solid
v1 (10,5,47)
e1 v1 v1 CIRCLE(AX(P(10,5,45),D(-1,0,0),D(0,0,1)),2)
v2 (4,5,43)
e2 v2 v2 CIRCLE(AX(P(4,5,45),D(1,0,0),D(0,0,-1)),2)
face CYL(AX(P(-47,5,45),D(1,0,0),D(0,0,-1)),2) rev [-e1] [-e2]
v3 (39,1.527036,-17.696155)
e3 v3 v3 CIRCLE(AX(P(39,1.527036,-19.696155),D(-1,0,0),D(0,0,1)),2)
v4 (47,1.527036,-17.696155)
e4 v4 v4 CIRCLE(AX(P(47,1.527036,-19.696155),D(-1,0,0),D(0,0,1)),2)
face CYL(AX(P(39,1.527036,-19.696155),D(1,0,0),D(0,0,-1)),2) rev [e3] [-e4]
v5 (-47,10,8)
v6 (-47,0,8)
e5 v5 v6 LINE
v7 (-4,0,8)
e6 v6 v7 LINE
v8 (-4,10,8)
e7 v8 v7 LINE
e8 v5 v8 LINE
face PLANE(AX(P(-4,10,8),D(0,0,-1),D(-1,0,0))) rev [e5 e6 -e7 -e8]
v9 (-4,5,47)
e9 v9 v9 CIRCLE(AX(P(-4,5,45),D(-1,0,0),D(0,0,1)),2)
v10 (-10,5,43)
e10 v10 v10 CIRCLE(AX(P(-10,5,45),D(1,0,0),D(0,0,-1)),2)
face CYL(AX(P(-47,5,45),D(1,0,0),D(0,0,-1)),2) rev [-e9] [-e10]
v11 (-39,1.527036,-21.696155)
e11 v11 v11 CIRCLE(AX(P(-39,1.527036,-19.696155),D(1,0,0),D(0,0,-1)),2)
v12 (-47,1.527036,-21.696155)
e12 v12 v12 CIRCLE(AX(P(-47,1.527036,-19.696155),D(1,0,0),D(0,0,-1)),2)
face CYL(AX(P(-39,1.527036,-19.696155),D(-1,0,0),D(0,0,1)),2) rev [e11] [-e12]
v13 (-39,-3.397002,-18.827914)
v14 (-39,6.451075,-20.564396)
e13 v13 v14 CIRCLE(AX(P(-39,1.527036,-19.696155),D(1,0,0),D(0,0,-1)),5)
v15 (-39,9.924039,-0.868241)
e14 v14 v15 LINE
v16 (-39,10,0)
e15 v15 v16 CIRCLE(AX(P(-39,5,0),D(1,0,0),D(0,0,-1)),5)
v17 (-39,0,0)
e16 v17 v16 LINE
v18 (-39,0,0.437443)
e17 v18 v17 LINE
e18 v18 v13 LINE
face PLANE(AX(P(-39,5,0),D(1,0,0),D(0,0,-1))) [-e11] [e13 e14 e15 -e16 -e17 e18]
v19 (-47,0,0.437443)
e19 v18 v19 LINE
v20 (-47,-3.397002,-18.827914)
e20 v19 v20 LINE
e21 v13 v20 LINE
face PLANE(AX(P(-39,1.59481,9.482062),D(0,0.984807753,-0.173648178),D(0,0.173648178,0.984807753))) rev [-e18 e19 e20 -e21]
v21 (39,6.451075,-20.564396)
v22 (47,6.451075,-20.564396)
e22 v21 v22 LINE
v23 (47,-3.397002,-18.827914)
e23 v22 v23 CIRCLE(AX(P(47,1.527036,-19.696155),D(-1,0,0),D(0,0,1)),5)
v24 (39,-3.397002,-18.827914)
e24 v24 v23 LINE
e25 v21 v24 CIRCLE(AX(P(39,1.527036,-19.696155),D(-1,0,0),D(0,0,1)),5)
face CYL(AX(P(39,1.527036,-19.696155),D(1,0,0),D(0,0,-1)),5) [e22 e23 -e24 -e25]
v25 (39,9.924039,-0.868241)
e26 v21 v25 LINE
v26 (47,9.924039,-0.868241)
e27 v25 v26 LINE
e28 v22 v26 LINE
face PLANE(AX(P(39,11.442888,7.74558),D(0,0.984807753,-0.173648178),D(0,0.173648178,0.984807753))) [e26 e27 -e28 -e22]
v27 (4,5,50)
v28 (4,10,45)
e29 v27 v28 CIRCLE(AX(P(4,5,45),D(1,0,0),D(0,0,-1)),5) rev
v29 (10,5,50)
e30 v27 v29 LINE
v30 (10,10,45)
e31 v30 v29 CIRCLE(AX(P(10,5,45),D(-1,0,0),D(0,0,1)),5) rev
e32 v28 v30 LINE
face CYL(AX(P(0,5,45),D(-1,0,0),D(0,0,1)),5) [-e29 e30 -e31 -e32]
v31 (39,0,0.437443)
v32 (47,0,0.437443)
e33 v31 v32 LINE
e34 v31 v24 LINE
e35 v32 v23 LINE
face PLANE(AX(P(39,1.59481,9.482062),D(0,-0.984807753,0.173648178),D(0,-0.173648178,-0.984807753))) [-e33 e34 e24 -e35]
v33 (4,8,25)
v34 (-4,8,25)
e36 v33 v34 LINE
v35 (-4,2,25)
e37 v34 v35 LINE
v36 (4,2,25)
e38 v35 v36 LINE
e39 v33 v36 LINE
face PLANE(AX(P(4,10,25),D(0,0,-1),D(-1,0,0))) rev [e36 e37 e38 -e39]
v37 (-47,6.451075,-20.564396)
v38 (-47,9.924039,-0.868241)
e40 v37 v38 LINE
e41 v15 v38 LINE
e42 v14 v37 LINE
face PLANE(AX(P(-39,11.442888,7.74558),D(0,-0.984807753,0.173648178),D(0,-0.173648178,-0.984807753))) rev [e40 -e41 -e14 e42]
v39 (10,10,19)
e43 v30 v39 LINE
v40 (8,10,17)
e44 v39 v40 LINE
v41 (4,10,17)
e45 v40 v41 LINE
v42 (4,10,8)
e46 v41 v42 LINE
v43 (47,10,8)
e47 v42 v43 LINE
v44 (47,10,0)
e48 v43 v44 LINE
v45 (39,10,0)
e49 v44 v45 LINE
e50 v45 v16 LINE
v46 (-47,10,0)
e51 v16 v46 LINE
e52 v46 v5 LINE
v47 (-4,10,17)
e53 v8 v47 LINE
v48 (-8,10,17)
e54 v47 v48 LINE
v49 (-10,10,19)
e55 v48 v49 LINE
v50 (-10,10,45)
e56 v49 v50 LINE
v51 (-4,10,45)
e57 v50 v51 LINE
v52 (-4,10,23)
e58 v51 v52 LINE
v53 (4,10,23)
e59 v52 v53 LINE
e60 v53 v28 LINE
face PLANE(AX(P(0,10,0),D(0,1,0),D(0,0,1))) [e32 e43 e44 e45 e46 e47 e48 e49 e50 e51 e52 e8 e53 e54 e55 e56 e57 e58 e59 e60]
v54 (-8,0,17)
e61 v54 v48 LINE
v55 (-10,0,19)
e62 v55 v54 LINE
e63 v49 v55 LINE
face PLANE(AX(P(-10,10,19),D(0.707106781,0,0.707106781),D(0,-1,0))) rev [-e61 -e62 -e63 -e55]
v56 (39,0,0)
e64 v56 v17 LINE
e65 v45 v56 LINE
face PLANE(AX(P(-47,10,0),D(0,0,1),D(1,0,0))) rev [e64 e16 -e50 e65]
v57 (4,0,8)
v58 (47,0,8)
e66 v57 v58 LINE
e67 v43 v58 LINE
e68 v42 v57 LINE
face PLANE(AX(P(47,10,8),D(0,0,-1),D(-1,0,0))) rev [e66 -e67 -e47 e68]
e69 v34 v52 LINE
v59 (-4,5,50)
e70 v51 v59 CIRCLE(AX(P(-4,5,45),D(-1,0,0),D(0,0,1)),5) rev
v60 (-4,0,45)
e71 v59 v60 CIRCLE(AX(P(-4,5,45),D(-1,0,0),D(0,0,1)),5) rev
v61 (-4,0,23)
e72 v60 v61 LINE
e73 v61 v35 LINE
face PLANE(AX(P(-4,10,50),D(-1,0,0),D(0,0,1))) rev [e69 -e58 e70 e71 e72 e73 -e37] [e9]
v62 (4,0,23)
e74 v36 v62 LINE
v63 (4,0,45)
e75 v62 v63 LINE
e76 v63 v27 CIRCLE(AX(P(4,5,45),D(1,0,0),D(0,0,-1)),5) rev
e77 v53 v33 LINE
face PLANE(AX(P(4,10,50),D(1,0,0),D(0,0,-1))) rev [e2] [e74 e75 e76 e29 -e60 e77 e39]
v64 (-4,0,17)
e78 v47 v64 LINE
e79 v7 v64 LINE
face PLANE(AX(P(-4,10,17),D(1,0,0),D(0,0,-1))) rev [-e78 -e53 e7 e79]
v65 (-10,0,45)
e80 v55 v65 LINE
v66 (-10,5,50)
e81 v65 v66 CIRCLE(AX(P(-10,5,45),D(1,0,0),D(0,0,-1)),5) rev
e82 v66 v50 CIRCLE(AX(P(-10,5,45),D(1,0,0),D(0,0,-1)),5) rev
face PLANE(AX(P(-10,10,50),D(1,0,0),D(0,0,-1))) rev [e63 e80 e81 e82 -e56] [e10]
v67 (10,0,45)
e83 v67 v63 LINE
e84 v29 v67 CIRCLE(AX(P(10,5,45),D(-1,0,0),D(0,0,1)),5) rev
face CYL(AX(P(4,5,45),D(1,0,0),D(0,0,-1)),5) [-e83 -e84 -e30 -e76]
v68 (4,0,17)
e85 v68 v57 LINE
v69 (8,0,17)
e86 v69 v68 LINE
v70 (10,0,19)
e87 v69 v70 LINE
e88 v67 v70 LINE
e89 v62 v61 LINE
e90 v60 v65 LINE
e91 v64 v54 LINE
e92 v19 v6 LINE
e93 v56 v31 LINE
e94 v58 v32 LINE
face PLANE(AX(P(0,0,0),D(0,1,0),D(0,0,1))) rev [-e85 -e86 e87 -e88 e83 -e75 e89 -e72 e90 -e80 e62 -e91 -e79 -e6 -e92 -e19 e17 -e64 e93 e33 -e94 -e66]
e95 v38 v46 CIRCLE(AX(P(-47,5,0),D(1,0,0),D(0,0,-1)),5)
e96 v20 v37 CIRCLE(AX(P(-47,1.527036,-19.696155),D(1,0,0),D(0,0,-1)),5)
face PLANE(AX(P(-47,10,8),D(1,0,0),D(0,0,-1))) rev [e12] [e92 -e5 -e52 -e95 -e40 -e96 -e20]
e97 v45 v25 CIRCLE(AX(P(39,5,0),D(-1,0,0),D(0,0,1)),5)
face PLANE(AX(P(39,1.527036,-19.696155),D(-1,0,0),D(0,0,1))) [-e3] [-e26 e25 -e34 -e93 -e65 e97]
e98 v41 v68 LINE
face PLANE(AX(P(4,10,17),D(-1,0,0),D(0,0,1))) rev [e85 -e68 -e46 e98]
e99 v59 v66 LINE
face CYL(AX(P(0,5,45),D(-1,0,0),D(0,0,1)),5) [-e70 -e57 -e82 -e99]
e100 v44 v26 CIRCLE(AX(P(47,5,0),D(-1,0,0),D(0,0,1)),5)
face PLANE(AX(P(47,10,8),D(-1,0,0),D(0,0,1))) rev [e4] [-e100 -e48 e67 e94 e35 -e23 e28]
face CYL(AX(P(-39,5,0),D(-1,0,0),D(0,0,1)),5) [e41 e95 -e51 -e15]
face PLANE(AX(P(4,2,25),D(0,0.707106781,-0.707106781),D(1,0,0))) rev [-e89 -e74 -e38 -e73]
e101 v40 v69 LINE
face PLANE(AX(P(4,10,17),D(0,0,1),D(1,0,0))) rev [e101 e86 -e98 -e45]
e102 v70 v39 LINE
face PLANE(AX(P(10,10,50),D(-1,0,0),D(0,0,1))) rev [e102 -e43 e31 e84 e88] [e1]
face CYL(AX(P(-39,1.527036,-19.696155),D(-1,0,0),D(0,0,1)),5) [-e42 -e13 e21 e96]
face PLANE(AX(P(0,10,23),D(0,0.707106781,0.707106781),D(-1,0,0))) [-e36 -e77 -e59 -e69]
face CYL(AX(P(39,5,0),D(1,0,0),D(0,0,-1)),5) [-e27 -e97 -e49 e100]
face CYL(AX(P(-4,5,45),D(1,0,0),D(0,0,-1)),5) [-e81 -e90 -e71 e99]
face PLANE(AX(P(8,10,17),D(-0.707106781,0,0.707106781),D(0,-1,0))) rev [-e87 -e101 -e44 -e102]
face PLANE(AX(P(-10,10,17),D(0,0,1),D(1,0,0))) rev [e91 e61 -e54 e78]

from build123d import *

# Parameters (mm, degrees)
EXTRUDE_1_DEPTH          = 10
FILLET_1_R               = 5
EXTRUDE_START            = 47
SKETCH_6_R               = 2
EXTRUDE_2_DEPTH          = 8
EXTRUDE_START_2          = -39
SKETCH_6_2_R             = 2
EXTRUDE_3_DEPTH          = 8
CUT_EXTRUDE_4_DEPTH      = 70.34695379
CUT_EXTRUDE_4_DEPTH_BACK = 70.34695379
SKETCH_7_R               = 2
CHAMFER_1_SIZE           = 2
CHAMFER_2_SIZE           = 2


with BuildPart() as part:
    # 草图1 → 凸台-拉伸1 (new body)
    with BuildSketch(Plane(origin=(0, 0, 0), x_dir=(1, 0, 0), z_dir=(0, 1, 0))):
        Polygon((-4, -50), (-10, -50), (-10, -17), (-4, -17), (-4, -8), (-47, -8), (-47, 0), (47, 0), (47, -8), (4, -8), (4, -17), (10, -17), (10, -50), (4, -50), (4, -25), (-4, -25), align=None)
    extrude(amount=EXTRUDE_1_DEPTH)

    # 圆角1
    fillet_1_edges = [part.edges().sort_by_distance(p)[0] for p in [
        (-7, 0, 50),
        (-7, 10, 50),
        (7, 10, 50),
        (7, 0, 50),
    ]]
    fillet(fillet_1_edges, radius=FILLET_1_R - 0.0001)  # a hair under: the kernel refuses the full size

    # 草图6 → 凸台-拉伸2 (add)
    with BuildSketch(Plane(origin=(0, 0, 0), x_dir=(0, 0, -1), z_dir=(1, 0, 0)).offset(EXTRUDE_START)):
        with BuildLine():
            Line((0.868240888, 9.924038765), (20.564395949, 6.451075212))
            ThreePointArc((20.564395949, 6.451075212), (24.620193825, 0.658795558), (18.827914172, -3.397002318))
            Line((18.827914172, -3.397002318), (-0.868240888, 0.075961235))
            ThreePointArc((-0.868240888, 0.075961235), (-4.924038765, 5.868240888), (0.868240888, 9.924038765))
        make_face()
        with Locations(Location((19.69615506, 1.527036447, 0), (0, 0, 180))):
            Circle(SKETCH_6_R, mode=Mode.SUBTRACT)
    extrude(amount=-EXTRUDE_2_DEPTH)

    # 草图6<2> → 凸台-拉伸3 (add)
    with BuildSketch(Plane(origin=(0, 0, 0), x_dir=(0, 0, -1), z_dir=(1, 0, 0)).offset(EXTRUDE_START_2)):
        with BuildLine():
            Line((0.868240888, 9.924038765), (20.564395949, 6.451075212))
            ThreePointArc((20.564395949, 6.451075212), (24.620193825, 0.658795558), (18.827914172, -3.397002318))
            Line((18.827914172, -3.397002318), (-0.868240888, 0.075961235))
            ThreePointArc((-0.868240888, 0.075961235), (-4.924038765, 5.868240888), (0.868240888, 9.924038765))
        make_face()
        with Locations(Location((19.69615506, 1.527036447, 0), (0, 0, 180))):
            Circle(SKETCH_6_2_R, mode=Mode.SUBTRACT)
    extrude(amount=-EXTRUDE_3_DEPTH)

    # 草图7 → 切除-拉伸4 (cut, two sides: drawn at the far end of the back side and taken through both)
    with BuildSketch(Plane(origin=(0, 0, 0), x_dir=(0, 0, -1), z_dir=(1, 0, 0)).offset(-CUT_EXTRUDE_4_DEPTH_BACK)):
        with Locations((-45, 5)):
            Circle(SKETCH_7_R)
    extrude(amount=CUT_EXTRUDE_4_DEPTH + CUT_EXTRUDE_4_DEPTH_BACK, mode=Mode.SUBTRACT)

    # 倒角1
    chamfer_1_edges = [part.edges().sort_by_distance(p)[0] for p in [
        (0, 0, 25),
        (0, 10, 25),
    ]]
    chamfer(chamfer_1_edges, length=CHAMFER_1_SIZE)

    # 倒角2
    chamfer_2_edges = [part.edges().sort_by_distance(p)[0] for p in [
        (10, 5, 17),
        (-10, 5, 17),
    ]]
    chamfer(chamfer_2_edges, length=CHAMFER_2_SIZE)


solid = part.part
